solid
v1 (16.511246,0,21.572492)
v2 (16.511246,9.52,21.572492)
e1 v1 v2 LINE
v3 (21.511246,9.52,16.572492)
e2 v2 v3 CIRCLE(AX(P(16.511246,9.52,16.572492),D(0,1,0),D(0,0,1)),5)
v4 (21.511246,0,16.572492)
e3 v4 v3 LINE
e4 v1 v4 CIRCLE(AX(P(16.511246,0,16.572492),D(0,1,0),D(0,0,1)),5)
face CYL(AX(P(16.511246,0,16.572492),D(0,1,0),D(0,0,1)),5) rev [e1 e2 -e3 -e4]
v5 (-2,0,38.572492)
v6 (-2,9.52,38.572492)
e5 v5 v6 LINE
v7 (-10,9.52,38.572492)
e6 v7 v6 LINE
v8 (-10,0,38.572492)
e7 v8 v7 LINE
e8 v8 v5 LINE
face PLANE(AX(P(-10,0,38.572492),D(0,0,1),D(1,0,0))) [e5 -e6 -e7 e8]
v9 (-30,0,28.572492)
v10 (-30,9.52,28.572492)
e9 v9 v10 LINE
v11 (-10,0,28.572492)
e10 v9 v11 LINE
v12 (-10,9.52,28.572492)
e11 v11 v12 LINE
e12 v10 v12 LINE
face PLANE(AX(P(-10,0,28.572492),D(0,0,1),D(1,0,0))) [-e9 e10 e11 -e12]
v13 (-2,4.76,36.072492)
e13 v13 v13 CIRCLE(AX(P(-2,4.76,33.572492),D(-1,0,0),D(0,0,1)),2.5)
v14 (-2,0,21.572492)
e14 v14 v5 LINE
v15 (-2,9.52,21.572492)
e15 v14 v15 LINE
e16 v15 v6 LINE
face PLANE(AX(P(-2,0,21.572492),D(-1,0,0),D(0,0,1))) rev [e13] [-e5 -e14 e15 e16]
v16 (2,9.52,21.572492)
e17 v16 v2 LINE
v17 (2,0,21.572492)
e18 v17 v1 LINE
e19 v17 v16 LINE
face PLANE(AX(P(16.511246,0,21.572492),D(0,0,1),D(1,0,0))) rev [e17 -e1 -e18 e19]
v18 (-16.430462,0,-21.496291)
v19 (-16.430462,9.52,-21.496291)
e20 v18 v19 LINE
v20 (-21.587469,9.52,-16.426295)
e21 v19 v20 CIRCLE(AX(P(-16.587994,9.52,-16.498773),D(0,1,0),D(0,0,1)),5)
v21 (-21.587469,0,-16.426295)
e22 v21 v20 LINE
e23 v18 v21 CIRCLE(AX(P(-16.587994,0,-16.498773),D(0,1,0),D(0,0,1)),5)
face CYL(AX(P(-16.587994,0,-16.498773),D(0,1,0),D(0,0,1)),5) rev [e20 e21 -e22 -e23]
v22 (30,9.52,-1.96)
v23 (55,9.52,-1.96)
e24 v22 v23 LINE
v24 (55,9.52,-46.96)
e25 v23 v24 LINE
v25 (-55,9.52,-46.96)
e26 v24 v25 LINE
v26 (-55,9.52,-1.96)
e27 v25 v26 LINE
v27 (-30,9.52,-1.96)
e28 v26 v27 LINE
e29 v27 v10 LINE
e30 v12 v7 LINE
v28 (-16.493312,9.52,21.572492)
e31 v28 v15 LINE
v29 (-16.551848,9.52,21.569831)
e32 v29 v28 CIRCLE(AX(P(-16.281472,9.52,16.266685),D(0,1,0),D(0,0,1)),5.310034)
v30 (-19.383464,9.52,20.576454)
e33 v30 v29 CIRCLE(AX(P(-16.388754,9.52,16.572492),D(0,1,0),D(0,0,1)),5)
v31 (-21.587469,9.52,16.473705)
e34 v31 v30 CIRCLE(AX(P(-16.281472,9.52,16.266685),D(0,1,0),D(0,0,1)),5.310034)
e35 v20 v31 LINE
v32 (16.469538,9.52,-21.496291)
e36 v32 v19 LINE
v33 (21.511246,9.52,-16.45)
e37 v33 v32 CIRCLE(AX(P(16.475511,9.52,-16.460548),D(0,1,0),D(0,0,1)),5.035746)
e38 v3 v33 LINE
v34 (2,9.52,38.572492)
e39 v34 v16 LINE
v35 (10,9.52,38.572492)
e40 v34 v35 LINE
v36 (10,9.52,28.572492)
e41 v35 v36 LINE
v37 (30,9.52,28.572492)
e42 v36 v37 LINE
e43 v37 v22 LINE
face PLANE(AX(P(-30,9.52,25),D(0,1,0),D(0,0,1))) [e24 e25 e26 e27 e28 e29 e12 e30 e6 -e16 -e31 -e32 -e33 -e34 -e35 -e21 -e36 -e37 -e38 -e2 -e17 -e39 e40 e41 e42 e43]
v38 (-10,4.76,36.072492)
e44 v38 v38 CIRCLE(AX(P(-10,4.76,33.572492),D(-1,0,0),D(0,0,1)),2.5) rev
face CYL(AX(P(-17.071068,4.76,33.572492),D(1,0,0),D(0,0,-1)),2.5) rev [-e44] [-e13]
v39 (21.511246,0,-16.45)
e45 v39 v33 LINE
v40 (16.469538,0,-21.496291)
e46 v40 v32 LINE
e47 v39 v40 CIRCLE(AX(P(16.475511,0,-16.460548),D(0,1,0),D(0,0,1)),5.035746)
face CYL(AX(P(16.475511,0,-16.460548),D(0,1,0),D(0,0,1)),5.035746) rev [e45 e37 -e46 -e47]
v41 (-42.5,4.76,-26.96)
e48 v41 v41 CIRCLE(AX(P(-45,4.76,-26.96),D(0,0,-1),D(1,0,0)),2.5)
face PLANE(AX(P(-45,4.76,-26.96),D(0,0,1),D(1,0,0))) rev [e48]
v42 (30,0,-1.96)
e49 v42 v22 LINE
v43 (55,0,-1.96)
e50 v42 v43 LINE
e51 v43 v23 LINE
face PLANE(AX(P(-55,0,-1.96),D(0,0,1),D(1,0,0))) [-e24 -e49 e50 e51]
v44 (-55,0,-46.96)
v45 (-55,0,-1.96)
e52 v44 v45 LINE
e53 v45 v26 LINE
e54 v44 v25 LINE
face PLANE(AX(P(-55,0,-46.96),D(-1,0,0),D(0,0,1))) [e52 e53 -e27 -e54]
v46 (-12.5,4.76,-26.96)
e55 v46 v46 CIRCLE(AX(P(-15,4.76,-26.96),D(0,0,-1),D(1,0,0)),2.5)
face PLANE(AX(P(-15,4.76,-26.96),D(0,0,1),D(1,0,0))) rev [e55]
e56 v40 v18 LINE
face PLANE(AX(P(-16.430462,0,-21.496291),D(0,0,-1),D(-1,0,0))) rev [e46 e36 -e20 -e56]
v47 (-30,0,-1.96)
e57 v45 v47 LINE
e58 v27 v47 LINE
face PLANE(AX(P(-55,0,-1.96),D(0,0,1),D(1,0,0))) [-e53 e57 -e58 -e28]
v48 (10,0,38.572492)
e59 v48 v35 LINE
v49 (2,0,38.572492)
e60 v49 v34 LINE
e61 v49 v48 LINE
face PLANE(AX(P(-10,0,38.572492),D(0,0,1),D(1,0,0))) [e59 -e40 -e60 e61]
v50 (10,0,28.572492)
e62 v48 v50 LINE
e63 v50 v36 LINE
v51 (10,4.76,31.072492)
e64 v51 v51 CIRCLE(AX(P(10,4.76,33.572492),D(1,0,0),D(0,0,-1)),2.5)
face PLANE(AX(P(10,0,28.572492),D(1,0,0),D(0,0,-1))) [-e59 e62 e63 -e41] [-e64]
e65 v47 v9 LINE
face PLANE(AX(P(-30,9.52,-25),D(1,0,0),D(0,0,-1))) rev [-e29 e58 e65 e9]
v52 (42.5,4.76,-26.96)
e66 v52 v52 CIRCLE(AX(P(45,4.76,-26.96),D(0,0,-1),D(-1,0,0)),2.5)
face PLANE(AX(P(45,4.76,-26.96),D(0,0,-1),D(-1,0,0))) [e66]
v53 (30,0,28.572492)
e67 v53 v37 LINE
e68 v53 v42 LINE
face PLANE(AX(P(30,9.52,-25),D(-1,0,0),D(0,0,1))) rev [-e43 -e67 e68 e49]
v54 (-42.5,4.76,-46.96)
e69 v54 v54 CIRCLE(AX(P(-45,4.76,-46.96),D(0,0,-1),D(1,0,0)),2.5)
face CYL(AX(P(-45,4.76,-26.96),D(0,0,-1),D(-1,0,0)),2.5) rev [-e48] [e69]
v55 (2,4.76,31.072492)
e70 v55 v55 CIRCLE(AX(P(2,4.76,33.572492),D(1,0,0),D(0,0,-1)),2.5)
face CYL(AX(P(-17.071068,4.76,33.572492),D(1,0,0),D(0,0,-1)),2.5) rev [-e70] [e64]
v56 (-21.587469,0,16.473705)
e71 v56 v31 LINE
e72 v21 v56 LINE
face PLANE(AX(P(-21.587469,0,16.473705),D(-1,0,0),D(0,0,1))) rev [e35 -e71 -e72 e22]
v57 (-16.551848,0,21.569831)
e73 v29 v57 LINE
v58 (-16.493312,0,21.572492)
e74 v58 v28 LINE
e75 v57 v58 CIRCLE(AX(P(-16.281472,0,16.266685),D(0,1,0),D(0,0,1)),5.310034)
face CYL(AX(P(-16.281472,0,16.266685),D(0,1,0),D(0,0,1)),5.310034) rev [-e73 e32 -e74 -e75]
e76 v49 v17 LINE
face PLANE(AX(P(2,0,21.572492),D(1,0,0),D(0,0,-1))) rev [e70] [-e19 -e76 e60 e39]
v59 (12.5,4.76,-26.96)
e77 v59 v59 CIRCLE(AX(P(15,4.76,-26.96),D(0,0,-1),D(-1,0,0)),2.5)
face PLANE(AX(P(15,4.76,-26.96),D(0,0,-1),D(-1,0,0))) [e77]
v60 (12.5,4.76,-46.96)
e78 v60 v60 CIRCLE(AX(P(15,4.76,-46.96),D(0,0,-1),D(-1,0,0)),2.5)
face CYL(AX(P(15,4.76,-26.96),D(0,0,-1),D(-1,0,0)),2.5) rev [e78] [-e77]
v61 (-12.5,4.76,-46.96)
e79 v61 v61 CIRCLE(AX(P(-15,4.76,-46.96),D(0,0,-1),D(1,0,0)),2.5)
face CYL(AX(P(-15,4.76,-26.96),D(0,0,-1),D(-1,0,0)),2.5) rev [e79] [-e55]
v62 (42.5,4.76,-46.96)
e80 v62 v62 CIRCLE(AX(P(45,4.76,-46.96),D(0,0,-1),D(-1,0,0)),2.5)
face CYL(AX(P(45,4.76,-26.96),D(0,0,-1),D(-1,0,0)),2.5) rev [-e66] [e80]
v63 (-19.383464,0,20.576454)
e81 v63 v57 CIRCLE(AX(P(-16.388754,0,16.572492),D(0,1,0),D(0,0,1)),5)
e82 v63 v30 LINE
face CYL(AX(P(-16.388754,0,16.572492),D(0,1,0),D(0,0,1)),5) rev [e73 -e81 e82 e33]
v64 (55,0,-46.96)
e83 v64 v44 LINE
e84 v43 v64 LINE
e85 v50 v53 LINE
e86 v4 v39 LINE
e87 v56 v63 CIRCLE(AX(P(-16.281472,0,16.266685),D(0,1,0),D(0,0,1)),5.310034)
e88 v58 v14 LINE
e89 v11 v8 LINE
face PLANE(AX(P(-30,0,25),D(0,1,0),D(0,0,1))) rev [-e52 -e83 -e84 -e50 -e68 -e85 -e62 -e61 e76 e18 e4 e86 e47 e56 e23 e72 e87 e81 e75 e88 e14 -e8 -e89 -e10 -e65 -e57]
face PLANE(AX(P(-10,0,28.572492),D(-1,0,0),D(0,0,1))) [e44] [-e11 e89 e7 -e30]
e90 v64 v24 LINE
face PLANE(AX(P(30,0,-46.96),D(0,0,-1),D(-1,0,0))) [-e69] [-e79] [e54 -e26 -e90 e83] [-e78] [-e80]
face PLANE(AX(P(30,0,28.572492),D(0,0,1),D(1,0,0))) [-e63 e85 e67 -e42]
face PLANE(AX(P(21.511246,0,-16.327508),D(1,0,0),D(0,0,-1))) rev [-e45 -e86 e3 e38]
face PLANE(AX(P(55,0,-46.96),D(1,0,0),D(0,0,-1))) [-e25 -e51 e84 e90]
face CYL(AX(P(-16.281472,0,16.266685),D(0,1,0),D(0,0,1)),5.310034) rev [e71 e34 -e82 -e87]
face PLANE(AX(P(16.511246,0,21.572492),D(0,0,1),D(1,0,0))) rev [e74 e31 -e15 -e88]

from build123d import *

# Parameters (mm, degrees)
ESBO_O1_W                    = 60
ESBO_O1_H                    = 50
RESSALTO_EXTRUS_O1_DEPTH     = 9.52
CORTE_EXTRUS_O1_DEPTH        = 9.52
CORTE_EXTRUS_O1_START        = 7.26
CORTE_EXTRUS_O1_2_DEPTH      = 2.26
CORTE_EXTRUS_O1_3_DEPTH      = 2.2599999
CORTE_EXTRUS_O1_START_2      = -30
CORTE_EXTRUS_O1_4_OUTLINE_W  = 5.0000001
CORTE_EXTRUS_O1_4_OUTLINE_H  = 3.572491942
CORTE_EXTRUS_O1_4_DEPTH      = 28
CORTE_EXTRUS_O1_START_3      = 2
CORTE_EXTRUS_O1_5_OUTLINE_W  = 5.0000001
CORTE_EXTRUS_O1_5_OUTLINE_H  = 3.572491942
CORTE_EXTRUS_O1_5_DEPTH      = 28
CORTE_EXTRUS_O1_START_4      = -10
CORTE_EXTRUS_O1_6_DEPTH      = 8
CORTE_EXTRUS_O1_7_DEPTH      = 8
CORTE_EXTRUS_O1_START_5      = -46.96
CORTE_EXTRUS_O1_8_DEPTH      = 21.96
CORTE_EXTRUS_O1_START_6      = -26.96
CORTE_EXTRUS_O1_9_OUTLINE_W  = 25
CORTE_EXTRUS_O1_9_OUTLINE_H  = 5.0000001
CORTE_EXTRUS_O1_9_DEPTH      = 25
CORTE_EXTRUS_O1_10_OUTLINE_R = 2.5
CORTE_EXTRUS_O1_10_DEPTH     = 1.96


with BuildPart() as part:
    # Esboço1 → Ressalto-extrusão1 (new body)
    with BuildSketch(Plane(origin=(0, 0, 0), x_dir=(1, 0, 0), z_dir=(0, 1, 0))):
        Rectangle(ESBO_O1_W, ESBO_O1_H)
    extrude(amount=RESSALTO_EXTRUS_O1_DEPTH)

    # Corte-extrusão1: read off the stored shape, not the designer's step
    # Corte-extrusão1 outline → Corte-extrusão1 (cut)
    with BuildSketch(Plane(origin=(0, 0, 0), x_dir=(1, 0, 0), z_dir=(0, 1, 0))):
        with BuildLine():
            ThreePointArc((-16.551848481, -21.569831255), (-16.522584074, -21.571242343), (-16.493312326, -21.572491942))
            Line((-16.493312326, -21.572491942), (-2, -21.572491942))
            Line((-2, -21.572491942), (-2, -25))
            Line((-2, -25), (2, -25))
            Line((2, -25), (2, -21.572491942))
            Line((2, -21.572491942), (16.511245971, -21.572491942))
            ThreePointArc((16.511245971, -21.572491942), (20.046779877, -20.108025848), (21.511245971, -16.572491942))
            Line((21.511245971, -16.572491942), (21.511245971, 16.45))
            ThreePointArc((21.511245971, 16.45), (20.037938418, 20.019740143), (16.469538401, 21.496290566))
            Line((16.469538401, 21.496290566), (-16.430461599, 21.496290566))
            ThreePointArc((-16.430461599, 21.496290566), (-20.093320705, 20.064258273), (-21.587468917, 16.426295322))
            Line((-21.587468917, 16.426295322), (-21.587468917, -16.473704678))
            ThreePointArc((-21.587468917, -16.473704678), (-20.959260779, -18.779602466), (-19.383464148, -20.576453893))
            ThreePointArc((-19.383464148, -20.576453893), (-18.043937425, -21.290581379), (-16.551848481, -21.569831255))
        make_face()
    extrude(amount=CORTE_EXTRUS_O1_DEPTH, mode=Mode.SUBTRACT)

    # Corte-extrus_o1 2 outline → Corte-extrus_o1 2 (add)
    with BuildSketch(Plane(origin=(0, 0, 0), x_dir=(1, 0, 0), z_dir=(0, 1, 0)).offset(CORTE_EXTRUS_O1_START)):
        Polygon((-2, -38.572491942), (-2, -25), (-30, -25), (-30, -28.572491942), (-10, -28.572491942), (-10, -38.572491942), align=None)
        Polygon((30, -25), (2, -25), (2, -38.572491942), (10, -38.572491942), (10, -28.572491942), (30, -28.572491942), align=None)
        Polygon((-55, 1.96), (-30, 1.96), (-30, 25), (30, 25), (30, 1.96), (55, 1.96), (55, 46.96), (-55, 46.96), align=None)
    extrude(amount=CORTE_EXTRUS_O1_2_DEPTH)

    # Corte-extrus_o1 3 outline → Corte-extrus_o1 3 (add)
    with BuildSketch(Plane(origin=(0, 0, 0), x_dir=(1, 0, 0), z_dir=(0, 1, 0))):
        Polygon((-2, -38.572491942), (-2, -25), (-30, -25), (-30, -28.572491942), (-10, -28.572491942), (-10, -38.572491942), align=None)
        Polygon((30, -25), (2, -25), (2, -38.572491942), (10, -38.572491942), (10, -28.572491942), (30, -28.572491942), align=None)
        Polygon((-55, 1.96), (-30, 1.96), (-30, 25), (30, 25), (30, 1.96), (55, 1.96), (55, 46.96), (-55, 46.96), align=None)
    extrude(amount=CORTE_EXTRUS_O1_3_DEPTH)

    # Corte-extrus_o1 4 outline → Corte-extrus_o1 4 (add)
    with BuildSketch(Plane.YZ.offset(CORTE_EXTRUS_O1_START_2)):
        with Locations((4.75999995, 26.786245971)):
            Rectangle(CORTE_EXTRUS_O1_4_OUTLINE_W, CORTE_EXTRUS_O1_4_OUTLINE_H)
    extrude(amount=CORTE_EXTRUS_O1_4_DEPTH)

    # Corte-extrus_o1 5 outline → Corte-extrus_o1 5 (add)
    with BuildSketch(Plane.YZ.offset(CORTE_EXTRUS_O1_START_3)):
        with Locations((4.75999995, 26.786245971)):
            Rectangle(CORTE_EXTRUS_O1_5_OUTLINE_W, CORTE_EXTRUS_O1_5_OUTLINE_H)
    extrude(amount=CORTE_EXTRUS_O1_5_DEPTH)

    # Corte-extrus_o1 6 outline → Corte-extrus_o1 6 (add)
    with BuildSketch(Plane.YZ.offset(CORTE_EXTRUS_O1_START_4)):
        with BuildLine():
            Line((7.26, 28.572491942), (7.26, 33.572491942))
            ThreePointArc((7.26, 33.572491942), (4.76, 31.072491942), (2.26, 33.572491942))
            Line((2.26, 33.572491942), (2.2599999, 28.572491942))
            Line((2.2599999, 28.572491942), (7.26, 28.572491942))
        make_face()
        with BuildLine():
            ThreePointArc((2.26, 33.572491942), (4.76, 36.072491942), (7.26, 33.572491942))
            Line((7.26, 33.572491942), (7.26, 38.572491942))
            Line((7.26, 38.572491942), (2.2599999, 38.572491942))
            Line((2.2599999, 38.572491942), (2.26, 33.572491942))
        make_face()
    extrude(amount=CORTE_EXTRUS_O1_6_DEPTH)

    # Corte-extrus_o1 7 outline → Corte-extrus_o1 7 (add)
    with BuildSketch(Plane.YZ.offset(CORTE_EXTRUS_O1_START_3)):
        with BuildLine():
            Line((7.26, 28.572491942), (7.26, 33.572491942))
            ThreePointArc((7.26, 33.572491942), (4.76, 31.072491942), (2.26, 33.572491942))
            Line((2.26, 33.572491942), (2.2599999, 28.572491942))
            Line((2.2599999, 28.572491942), (7.26, 28.572491942))
        make_face()
        with BuildLine():
            ThreePointArc((2.26, 33.572491942), (4.76, 36.072491942), (7.26, 33.572491942))
            Line((7.26, 33.572491942), (7.26, 38.572491942))
            Line((7.26, 38.572491942), (2.2599999, 38.572491942))
            Line((2.2599999, 38.572491942), (2.26, 33.572491942))
        make_face()
    extrude(amount=CORTE_EXTRUS_O1_7_DEPTH)

    # Corte-extrus_o1 8 outline → Corte-extrus_o1 8 (add)
    with BuildSketch(Plane.XY.offset(CORTE_EXTRUS_O1_START_5)):
        with BuildLine():
            ThreePointArc((45, 7.26), (47.5, 4.76), (45, 2.26))
            Line((45, 2.26), (55, 2.2599999))
            Line((55, 2.2599999), (55, 7.26))
            Line((55, 7.26), (45, 7.26))
        make_face()
        with BuildLine():
            ThreePointArc((45, 2.26), (42.5, 4.76), (45, 7.26))
            Line((45, 7.26), (15.000000025, 7.26))
            ThreePointArc((15.000000025, 7.26), (17.5, 4.759999988), (15.000000001, 2.26))
            Line((15.000000001, 2.26), (45, 2.26))
        make_face()
        with BuildLine():
            ThreePointArc((15.000000001, 2.26), (12.5, 4.760000012), (15.000000025, 7.26))
            Line((15.000000025, 7.26), (-15.000000034, 7.26))
            ThreePointArc((-15.000000034, 7.26), (-12.5, 4.760000017), (-15, 2.26))
            Line((-15, 2.26), (15.000000001, 2.26))
        make_face()
        with BuildLine():
            ThreePointArc((-15, 2.26), (-17.5, 4.759999983), (-15.000000034, 7.26))
            Line((-15.000000034, 7.26), (-44.999999984, 7.26))
            ThreePointArc((-44.999999984, 7.26), (-42.5, 4.759999992), (-45, 2.26))
            Line((-45, 2.26), (-15, 2.26))
        make_face()
        with BuildLine():
            ThreePointArc((-45, 2.26), (-47.5, 4.760000008), (-44.999999984, 7.26))
            Line((-44.999999984, 7.26), (-55, 7.26))
            Line((-55, 7.26), (-55, 2.2599999))
            Line((-55, 2.2599999), (-45, 2.26))
        make_face()
    extrude(amount=CORTE_EXTRUS_O1_8_DEPTH)

    # Corte-extrus_o1 9 outline → Corte-extrus_o1 9 (add)
    with BuildSketch(Plane.XY.offset(CORTE_EXTRUS_O1_START_6)):
        with Locations((42.5, 4.75999995)):
            Rectangle(CORTE_EXTRUS_O1_9_OUTLINE_W, CORTE_EXTRUS_O1_9_OUTLINE_H)
        with Locations((-42.5, 4.75999995)):
            Rectangle(CORTE_EXTRUS_O1_9_OUTLINE_W, CORTE_EXTRUS_O1_9_OUTLINE_H)
    extrude(amount=CORTE_EXTRUS_O1_9_DEPTH)

    # Corte-extrus_o1 10 outline → Corte-extrus_o1 10 (add)
    with BuildSketch(Plane.XY.offset(CORTE_EXTRUS_O1_START_6)):
        with Locations((15, 4.76)):
            Circle(CORTE_EXTRUS_O1_10_OUTLINE_R)
        with Locations((-15, 4.76)):
            Circle(CORTE_EXTRUS_O1_10_OUTLINE_R)
    extrude(amount=CORTE_EXTRUS_O1_10_DEPTH)


solid = part.part
